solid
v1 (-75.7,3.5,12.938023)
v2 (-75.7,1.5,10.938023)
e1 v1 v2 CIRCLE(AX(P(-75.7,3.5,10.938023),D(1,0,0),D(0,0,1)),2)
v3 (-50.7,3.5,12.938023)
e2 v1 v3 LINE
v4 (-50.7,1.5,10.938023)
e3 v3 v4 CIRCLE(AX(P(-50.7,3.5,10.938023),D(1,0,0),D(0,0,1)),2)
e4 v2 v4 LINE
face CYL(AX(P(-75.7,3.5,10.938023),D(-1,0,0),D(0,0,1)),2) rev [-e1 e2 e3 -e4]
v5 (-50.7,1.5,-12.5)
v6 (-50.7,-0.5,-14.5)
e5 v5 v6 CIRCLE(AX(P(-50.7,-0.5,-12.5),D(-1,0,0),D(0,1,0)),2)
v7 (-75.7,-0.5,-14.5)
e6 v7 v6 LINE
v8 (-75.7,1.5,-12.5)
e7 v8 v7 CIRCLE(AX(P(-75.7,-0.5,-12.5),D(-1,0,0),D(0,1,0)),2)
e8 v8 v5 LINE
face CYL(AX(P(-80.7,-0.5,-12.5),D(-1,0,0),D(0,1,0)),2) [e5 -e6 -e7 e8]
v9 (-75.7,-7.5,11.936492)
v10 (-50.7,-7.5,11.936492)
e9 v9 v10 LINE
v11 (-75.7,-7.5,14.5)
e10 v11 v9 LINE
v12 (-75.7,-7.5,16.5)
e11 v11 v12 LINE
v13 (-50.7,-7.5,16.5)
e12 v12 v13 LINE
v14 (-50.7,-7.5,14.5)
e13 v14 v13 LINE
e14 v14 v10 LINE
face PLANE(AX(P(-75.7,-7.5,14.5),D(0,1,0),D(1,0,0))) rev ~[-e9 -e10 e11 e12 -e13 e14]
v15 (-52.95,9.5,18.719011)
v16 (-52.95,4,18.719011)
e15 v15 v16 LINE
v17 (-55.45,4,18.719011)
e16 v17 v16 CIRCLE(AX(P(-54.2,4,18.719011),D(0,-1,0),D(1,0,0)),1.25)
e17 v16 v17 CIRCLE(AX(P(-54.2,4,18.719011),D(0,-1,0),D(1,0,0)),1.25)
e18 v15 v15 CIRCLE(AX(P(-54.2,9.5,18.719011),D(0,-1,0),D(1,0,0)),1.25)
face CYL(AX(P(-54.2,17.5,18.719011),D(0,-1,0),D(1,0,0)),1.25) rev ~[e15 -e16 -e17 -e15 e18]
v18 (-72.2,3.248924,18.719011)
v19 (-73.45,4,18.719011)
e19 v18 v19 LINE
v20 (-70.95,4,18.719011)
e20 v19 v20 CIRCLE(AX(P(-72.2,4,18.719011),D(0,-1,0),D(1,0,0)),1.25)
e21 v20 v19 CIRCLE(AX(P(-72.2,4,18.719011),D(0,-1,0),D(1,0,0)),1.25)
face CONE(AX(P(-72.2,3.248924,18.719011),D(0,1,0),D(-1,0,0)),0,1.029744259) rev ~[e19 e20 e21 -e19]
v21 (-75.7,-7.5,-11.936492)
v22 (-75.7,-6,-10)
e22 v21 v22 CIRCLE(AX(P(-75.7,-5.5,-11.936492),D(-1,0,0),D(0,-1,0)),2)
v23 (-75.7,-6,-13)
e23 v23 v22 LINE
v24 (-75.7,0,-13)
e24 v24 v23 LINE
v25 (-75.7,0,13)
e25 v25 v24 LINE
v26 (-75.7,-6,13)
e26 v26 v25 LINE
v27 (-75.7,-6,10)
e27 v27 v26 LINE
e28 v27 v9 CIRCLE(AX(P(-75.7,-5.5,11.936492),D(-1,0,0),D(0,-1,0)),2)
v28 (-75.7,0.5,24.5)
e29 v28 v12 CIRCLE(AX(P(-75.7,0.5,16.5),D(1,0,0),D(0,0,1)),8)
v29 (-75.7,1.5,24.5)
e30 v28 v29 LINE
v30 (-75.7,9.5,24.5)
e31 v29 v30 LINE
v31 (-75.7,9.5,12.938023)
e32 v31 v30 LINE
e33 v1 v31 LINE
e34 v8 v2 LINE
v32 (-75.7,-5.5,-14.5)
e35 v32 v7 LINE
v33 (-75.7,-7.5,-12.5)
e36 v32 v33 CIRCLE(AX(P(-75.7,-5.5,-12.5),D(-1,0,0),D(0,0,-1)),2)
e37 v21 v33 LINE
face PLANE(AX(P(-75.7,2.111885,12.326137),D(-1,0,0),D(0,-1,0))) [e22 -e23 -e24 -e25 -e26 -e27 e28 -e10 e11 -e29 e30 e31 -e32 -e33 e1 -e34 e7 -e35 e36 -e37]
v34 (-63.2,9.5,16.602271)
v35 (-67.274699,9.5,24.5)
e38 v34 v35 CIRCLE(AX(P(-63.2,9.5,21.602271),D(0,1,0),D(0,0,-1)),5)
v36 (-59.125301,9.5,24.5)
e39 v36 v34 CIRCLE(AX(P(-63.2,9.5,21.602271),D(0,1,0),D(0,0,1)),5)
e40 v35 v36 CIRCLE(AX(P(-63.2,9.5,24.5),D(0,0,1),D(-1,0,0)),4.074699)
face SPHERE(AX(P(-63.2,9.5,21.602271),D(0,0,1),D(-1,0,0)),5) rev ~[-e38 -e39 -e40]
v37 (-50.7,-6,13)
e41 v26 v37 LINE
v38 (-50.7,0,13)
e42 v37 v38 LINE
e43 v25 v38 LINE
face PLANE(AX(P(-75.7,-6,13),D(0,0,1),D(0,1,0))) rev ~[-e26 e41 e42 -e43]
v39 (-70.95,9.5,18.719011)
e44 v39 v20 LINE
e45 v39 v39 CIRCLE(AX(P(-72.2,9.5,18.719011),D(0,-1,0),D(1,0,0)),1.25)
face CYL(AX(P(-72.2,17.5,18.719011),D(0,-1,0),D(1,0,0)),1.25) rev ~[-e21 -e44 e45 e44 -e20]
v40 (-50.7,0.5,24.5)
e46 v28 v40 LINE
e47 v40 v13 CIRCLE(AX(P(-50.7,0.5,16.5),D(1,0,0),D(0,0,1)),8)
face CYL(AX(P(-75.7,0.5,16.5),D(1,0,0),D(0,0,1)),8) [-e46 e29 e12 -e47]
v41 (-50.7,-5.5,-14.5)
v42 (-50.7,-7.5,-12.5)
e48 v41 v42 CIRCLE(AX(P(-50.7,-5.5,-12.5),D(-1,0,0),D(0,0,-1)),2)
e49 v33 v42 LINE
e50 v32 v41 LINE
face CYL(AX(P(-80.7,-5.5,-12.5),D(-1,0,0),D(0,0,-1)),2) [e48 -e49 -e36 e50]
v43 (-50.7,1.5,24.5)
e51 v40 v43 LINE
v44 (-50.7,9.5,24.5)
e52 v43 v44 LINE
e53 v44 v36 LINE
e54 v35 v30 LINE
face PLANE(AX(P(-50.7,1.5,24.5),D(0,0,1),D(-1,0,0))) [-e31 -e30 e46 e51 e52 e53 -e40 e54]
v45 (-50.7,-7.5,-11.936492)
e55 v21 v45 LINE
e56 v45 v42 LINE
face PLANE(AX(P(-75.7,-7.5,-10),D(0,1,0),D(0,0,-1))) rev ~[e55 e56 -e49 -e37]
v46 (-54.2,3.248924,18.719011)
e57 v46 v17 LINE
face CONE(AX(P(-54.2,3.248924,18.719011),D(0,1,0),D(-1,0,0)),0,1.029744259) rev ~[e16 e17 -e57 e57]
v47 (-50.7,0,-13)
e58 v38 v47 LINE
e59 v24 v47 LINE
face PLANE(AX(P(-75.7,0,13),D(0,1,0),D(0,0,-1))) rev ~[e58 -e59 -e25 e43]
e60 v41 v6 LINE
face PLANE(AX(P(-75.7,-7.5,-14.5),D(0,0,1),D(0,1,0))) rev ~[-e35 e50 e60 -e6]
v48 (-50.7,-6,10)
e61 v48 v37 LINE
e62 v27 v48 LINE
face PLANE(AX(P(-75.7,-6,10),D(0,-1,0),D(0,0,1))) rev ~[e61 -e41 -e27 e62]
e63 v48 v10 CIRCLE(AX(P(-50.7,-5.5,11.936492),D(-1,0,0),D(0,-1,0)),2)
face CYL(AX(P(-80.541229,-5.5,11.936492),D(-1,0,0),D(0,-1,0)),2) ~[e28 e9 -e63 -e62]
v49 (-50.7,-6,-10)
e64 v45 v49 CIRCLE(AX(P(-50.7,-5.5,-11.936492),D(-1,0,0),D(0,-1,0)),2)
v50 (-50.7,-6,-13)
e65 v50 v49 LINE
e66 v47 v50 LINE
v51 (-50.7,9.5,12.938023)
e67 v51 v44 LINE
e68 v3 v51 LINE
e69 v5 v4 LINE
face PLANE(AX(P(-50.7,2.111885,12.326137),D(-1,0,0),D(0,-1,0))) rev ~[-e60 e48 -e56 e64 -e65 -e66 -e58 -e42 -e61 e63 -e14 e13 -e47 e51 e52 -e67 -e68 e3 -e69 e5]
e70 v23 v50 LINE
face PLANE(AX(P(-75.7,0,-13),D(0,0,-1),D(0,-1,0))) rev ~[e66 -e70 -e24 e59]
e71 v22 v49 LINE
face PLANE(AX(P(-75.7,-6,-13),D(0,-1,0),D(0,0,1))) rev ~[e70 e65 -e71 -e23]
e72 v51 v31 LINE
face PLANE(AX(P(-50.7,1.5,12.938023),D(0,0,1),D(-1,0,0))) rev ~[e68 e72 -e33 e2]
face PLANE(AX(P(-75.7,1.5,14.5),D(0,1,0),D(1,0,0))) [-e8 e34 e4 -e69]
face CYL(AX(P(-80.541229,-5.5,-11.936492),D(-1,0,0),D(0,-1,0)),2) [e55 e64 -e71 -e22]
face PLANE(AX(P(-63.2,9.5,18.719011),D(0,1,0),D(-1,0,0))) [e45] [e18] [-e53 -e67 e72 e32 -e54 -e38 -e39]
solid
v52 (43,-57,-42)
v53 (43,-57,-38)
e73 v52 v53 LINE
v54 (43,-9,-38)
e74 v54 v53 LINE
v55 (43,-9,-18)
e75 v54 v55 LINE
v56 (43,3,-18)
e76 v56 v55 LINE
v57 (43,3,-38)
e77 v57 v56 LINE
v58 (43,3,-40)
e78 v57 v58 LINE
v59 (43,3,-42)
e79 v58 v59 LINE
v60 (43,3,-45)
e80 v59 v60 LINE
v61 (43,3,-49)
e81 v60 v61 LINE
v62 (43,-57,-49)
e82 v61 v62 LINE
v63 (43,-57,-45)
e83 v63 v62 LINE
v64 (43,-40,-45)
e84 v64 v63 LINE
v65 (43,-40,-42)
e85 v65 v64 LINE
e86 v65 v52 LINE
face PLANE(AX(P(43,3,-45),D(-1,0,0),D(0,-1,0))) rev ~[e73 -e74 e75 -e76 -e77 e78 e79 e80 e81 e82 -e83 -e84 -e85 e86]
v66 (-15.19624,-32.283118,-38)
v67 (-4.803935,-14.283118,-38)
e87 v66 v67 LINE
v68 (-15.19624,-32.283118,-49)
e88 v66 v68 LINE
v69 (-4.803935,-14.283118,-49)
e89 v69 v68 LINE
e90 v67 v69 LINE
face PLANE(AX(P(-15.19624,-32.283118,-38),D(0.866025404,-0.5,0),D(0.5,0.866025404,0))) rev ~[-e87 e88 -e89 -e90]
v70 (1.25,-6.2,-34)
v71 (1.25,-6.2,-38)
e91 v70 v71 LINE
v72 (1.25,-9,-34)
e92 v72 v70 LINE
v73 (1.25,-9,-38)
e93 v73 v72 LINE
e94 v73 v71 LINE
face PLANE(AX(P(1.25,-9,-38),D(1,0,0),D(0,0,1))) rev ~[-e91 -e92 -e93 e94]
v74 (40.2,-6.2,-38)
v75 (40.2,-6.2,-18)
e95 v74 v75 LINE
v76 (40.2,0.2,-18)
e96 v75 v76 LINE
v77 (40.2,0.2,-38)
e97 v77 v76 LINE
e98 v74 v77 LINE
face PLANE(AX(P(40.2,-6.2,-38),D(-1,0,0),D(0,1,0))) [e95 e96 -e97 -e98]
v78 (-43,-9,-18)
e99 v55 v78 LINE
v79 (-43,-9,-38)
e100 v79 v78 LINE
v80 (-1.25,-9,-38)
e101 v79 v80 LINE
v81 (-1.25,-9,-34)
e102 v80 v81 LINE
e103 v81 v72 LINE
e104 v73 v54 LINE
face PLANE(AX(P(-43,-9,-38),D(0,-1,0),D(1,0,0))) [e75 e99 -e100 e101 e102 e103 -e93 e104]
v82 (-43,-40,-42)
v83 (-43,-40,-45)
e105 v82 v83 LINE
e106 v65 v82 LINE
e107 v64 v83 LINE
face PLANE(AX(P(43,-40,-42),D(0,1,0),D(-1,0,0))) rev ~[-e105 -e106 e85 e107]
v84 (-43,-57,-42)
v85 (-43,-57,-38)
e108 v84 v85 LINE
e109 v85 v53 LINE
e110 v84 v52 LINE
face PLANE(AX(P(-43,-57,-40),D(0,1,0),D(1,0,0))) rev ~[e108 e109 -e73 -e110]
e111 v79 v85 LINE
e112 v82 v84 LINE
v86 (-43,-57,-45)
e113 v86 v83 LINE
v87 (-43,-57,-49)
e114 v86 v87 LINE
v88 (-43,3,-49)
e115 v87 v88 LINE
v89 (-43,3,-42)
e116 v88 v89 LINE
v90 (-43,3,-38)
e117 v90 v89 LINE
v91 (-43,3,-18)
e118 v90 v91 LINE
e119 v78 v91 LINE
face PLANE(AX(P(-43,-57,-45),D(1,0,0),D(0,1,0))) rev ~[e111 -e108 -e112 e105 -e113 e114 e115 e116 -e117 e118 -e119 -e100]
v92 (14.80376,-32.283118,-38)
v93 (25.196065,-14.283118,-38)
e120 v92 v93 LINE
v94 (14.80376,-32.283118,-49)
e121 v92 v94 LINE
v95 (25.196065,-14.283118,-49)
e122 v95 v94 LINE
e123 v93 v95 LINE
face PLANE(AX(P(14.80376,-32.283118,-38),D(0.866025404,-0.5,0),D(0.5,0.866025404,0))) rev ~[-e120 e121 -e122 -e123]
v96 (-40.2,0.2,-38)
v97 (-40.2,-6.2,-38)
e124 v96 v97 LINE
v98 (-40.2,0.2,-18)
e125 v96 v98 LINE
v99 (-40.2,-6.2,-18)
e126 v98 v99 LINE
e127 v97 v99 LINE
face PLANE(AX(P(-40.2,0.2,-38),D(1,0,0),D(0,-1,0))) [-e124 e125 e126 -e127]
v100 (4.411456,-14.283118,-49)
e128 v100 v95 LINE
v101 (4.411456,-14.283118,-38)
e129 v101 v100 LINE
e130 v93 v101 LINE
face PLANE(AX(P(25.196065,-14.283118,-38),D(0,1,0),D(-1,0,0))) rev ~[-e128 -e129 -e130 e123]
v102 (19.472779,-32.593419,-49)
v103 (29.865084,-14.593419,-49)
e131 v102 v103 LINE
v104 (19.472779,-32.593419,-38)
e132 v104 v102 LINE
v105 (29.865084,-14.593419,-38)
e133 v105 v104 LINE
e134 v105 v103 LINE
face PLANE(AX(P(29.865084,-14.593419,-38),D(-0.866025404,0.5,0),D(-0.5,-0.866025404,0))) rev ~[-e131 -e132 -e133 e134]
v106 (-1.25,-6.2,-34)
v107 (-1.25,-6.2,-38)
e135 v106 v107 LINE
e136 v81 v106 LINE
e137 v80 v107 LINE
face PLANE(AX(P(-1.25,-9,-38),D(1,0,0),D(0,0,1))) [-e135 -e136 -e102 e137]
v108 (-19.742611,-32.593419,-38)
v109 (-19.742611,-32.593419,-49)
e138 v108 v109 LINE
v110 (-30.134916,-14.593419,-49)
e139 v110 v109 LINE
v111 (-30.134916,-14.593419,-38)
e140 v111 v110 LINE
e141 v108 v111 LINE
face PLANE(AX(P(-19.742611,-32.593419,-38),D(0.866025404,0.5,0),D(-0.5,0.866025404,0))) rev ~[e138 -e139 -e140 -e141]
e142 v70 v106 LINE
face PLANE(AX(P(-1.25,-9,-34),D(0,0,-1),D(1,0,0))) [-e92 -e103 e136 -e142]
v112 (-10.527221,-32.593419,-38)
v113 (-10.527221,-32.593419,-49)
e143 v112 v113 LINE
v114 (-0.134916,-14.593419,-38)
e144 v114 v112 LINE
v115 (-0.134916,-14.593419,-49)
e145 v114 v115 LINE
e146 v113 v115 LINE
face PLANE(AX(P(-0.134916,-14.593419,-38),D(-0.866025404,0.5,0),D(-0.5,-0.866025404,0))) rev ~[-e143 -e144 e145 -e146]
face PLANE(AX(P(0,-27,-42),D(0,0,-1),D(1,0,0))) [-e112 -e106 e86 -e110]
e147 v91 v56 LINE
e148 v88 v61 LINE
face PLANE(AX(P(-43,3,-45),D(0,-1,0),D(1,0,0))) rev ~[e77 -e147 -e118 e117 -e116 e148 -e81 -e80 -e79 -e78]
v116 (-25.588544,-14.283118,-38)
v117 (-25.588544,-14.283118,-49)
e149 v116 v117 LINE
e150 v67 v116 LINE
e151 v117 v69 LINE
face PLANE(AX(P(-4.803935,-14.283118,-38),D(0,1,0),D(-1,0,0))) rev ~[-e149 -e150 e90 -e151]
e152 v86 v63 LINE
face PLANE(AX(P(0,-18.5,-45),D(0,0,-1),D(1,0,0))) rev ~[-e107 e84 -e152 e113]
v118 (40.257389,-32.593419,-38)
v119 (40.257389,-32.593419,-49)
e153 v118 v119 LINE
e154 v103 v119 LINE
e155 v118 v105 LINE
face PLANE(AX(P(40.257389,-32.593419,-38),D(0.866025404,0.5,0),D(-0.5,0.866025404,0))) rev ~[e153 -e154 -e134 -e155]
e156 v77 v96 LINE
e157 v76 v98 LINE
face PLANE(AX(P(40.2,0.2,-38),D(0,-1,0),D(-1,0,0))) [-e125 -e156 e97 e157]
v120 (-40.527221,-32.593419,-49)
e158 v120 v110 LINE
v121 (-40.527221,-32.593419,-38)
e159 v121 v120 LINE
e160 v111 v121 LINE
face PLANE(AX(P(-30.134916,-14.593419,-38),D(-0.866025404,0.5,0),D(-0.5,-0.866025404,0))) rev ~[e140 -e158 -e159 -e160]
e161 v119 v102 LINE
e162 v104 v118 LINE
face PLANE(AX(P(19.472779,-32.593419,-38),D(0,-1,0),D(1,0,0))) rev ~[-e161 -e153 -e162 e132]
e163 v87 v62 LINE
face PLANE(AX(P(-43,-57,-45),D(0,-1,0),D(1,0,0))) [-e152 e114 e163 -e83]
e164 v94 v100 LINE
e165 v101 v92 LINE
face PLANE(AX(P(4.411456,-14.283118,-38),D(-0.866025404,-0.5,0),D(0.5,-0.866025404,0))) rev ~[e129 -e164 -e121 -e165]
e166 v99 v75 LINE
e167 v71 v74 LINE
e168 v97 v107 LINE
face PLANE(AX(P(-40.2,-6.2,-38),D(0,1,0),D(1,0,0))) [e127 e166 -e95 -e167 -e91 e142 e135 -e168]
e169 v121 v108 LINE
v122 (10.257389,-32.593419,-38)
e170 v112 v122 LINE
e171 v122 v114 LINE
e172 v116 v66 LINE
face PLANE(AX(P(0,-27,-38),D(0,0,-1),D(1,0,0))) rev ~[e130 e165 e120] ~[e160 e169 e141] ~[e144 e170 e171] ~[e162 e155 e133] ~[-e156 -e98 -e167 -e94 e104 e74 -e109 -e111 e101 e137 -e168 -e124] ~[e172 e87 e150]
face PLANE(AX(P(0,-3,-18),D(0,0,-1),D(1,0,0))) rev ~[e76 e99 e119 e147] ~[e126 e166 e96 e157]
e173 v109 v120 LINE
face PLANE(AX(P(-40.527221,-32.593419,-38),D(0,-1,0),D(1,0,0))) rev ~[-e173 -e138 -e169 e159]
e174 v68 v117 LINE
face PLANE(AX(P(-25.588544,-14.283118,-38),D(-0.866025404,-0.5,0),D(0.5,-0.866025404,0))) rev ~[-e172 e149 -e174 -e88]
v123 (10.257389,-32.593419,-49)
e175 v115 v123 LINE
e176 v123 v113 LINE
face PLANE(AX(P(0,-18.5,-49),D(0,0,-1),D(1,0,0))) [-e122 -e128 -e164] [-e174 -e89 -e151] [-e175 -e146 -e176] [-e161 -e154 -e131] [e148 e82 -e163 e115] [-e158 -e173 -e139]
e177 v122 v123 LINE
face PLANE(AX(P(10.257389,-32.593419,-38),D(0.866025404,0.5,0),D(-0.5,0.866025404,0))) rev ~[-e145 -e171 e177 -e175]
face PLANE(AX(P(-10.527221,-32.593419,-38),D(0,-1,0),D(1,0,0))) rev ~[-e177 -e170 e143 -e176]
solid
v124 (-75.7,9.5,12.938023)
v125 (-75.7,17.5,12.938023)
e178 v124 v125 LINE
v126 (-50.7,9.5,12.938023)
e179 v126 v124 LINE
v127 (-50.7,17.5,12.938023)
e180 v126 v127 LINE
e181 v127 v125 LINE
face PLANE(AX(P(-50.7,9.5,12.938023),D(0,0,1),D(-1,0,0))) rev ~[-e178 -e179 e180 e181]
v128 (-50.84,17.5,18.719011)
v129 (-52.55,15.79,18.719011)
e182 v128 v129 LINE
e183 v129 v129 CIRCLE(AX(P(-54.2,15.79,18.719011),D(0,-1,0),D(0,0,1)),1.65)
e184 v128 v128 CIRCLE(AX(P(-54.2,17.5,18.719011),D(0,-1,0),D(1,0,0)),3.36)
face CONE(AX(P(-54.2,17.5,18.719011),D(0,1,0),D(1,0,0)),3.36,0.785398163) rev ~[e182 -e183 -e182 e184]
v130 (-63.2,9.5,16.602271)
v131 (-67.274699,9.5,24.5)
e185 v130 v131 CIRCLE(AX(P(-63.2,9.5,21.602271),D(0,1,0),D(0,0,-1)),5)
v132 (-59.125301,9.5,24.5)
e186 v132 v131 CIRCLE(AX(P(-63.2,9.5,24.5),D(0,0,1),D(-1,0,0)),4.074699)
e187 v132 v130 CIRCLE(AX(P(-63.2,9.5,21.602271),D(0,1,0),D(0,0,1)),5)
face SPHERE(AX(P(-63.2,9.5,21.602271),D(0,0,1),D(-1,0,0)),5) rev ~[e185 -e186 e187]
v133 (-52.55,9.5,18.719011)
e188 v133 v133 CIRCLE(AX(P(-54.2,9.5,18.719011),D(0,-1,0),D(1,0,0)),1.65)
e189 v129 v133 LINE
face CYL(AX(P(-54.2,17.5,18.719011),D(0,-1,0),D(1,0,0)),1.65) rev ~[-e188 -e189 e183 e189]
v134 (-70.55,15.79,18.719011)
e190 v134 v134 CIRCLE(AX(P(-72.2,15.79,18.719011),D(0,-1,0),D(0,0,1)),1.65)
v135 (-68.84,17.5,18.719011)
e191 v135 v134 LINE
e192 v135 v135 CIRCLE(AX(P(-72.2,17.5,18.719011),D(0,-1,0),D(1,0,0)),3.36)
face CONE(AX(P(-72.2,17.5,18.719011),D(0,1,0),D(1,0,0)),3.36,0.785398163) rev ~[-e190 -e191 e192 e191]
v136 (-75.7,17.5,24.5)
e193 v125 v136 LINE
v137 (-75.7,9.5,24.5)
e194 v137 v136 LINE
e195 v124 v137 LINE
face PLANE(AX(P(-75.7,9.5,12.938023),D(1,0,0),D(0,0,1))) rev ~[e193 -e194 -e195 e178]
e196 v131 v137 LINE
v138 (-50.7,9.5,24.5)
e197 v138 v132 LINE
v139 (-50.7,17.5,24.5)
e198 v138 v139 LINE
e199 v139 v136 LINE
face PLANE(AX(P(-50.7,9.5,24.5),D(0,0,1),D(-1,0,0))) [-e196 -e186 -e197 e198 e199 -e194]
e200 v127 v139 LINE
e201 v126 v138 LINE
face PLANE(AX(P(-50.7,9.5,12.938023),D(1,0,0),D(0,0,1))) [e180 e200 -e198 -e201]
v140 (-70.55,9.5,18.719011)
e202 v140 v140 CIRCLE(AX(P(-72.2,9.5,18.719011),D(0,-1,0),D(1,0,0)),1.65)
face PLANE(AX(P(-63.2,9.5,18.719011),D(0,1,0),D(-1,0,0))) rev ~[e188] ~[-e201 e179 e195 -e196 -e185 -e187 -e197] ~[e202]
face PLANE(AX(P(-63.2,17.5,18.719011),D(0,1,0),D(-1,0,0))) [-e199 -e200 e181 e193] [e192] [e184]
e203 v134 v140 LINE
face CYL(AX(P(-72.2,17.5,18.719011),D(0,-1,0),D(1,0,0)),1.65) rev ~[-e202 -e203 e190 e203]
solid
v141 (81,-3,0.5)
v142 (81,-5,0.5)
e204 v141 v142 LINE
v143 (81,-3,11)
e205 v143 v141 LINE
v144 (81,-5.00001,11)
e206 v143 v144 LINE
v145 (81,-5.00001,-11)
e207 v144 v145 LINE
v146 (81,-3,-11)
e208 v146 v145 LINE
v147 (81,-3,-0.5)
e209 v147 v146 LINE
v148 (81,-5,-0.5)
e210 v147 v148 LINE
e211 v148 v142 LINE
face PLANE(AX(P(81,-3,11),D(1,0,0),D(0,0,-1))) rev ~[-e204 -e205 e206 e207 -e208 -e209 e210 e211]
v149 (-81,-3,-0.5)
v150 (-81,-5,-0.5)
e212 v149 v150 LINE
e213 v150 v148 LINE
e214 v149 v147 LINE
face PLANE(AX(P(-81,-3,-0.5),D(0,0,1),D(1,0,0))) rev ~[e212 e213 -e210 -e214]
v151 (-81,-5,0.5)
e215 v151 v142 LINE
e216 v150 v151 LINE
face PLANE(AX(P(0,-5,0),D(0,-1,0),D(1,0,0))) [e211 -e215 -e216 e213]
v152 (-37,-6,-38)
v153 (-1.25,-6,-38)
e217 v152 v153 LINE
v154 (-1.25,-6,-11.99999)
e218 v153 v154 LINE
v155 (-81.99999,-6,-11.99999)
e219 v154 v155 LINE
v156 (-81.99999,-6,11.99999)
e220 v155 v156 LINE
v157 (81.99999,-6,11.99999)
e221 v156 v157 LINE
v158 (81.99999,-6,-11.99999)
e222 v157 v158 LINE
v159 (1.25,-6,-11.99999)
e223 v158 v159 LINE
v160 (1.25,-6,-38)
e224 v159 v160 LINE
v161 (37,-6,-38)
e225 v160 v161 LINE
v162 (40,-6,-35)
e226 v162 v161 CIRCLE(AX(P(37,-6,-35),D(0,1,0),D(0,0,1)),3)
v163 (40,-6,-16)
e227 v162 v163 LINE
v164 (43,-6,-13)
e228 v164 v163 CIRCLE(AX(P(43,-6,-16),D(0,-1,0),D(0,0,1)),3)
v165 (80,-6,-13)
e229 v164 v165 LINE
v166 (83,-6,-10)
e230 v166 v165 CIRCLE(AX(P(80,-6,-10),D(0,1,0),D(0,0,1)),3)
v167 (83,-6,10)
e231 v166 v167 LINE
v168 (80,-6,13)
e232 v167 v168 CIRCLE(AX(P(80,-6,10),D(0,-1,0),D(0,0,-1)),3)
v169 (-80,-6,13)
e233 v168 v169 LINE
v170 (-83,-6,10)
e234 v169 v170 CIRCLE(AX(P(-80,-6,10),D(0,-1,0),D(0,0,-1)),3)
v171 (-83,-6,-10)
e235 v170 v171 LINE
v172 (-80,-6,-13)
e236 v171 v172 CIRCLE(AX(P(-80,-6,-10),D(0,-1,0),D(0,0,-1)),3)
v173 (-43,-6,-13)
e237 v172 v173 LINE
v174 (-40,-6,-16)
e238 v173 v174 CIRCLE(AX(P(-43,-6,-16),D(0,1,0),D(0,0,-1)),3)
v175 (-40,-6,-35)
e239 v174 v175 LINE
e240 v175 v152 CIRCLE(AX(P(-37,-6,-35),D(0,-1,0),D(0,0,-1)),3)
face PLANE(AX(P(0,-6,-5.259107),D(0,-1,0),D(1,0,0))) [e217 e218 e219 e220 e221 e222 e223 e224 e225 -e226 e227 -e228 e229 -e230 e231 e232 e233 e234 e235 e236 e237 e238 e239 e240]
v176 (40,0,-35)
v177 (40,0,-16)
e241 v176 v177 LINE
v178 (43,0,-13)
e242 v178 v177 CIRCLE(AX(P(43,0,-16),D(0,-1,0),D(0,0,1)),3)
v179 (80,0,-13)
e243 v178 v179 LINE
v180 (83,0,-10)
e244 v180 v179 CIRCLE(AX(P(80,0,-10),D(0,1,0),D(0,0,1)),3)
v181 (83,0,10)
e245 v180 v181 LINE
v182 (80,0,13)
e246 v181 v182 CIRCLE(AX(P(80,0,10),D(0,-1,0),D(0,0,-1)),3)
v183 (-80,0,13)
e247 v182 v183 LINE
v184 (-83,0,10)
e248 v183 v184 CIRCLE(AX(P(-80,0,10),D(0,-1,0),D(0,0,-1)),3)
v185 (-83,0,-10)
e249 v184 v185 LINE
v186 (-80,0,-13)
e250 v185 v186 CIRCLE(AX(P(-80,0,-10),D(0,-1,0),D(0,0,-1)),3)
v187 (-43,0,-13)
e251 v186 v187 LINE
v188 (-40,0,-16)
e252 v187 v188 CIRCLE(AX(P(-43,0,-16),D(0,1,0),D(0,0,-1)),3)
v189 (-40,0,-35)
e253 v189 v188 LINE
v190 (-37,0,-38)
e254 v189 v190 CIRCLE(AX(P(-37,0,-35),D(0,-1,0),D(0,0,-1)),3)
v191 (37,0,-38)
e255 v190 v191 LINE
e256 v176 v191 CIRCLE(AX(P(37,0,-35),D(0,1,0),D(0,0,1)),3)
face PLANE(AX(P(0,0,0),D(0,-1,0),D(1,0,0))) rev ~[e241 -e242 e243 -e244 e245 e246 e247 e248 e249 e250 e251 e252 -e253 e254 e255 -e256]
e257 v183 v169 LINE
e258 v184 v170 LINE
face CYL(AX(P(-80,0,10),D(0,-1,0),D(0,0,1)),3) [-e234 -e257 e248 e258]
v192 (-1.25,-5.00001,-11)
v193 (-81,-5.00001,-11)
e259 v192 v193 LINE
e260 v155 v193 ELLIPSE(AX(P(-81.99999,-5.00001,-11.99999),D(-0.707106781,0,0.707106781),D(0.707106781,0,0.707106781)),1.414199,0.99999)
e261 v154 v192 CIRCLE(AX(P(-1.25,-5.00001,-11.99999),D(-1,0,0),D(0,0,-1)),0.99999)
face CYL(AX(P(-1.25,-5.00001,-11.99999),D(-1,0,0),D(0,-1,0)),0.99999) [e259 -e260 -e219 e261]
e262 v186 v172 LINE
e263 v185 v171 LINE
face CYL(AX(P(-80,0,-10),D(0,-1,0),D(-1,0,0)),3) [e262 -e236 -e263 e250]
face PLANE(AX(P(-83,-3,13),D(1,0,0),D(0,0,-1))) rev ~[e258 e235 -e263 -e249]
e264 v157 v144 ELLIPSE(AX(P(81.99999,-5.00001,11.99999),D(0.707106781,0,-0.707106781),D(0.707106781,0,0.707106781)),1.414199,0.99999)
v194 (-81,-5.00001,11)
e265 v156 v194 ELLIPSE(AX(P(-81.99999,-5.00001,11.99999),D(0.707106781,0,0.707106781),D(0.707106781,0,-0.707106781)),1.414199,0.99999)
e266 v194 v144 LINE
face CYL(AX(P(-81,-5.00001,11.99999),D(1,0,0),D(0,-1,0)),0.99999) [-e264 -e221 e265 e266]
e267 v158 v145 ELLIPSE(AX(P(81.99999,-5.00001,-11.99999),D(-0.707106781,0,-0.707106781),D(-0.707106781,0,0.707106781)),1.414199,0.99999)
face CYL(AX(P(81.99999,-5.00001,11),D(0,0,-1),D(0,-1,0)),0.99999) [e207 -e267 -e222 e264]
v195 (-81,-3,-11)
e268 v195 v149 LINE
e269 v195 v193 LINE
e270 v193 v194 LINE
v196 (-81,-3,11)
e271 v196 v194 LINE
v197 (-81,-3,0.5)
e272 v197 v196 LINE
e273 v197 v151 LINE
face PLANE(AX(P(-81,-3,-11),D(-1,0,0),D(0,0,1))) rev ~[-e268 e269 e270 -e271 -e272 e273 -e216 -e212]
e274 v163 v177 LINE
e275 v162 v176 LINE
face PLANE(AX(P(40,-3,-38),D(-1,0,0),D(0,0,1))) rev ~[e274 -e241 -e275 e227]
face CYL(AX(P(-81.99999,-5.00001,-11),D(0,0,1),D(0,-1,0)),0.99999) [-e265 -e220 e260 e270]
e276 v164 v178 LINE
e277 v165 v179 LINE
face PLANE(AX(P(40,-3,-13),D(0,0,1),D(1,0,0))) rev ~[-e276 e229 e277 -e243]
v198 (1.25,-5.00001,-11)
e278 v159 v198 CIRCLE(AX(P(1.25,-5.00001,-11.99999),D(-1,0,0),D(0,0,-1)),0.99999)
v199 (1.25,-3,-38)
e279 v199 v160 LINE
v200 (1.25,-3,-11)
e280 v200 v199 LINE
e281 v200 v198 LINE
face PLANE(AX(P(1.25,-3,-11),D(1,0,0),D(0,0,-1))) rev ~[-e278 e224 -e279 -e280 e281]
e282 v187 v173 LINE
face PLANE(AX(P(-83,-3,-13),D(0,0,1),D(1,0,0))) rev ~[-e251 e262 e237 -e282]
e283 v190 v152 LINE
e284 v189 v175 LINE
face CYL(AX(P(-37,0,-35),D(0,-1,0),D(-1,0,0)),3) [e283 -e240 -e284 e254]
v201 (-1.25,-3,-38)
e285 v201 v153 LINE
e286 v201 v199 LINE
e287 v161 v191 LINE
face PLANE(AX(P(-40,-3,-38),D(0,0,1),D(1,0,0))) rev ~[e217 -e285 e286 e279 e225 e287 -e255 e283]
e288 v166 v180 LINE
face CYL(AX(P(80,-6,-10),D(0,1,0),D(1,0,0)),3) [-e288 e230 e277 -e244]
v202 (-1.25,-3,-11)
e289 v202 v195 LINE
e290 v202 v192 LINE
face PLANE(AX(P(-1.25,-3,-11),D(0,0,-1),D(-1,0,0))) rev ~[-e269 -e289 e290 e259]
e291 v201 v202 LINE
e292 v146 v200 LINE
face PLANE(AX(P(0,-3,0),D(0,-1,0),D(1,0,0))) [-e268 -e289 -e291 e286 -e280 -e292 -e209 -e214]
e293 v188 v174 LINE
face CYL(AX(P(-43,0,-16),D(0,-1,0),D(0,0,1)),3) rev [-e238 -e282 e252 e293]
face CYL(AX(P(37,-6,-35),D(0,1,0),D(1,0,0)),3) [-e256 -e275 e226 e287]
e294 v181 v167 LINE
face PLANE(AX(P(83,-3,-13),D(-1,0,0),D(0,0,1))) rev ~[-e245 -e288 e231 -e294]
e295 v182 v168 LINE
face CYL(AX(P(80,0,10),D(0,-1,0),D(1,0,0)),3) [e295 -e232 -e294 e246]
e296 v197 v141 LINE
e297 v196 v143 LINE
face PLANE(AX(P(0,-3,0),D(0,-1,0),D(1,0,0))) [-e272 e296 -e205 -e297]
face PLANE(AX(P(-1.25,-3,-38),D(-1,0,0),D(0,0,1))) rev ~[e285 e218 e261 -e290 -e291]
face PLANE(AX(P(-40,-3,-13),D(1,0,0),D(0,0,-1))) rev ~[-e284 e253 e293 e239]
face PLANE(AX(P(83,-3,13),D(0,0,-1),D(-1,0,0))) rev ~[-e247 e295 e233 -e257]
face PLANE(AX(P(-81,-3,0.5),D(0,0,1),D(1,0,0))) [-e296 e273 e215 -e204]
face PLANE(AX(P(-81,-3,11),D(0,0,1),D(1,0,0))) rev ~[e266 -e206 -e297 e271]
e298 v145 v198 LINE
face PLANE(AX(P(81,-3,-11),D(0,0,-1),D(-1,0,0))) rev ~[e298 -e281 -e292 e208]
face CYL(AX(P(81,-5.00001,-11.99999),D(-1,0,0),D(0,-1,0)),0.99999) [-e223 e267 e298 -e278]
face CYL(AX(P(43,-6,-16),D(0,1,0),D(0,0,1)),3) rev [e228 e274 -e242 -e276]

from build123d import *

# Parameters (mm, degrees)
F0_W              = 80
F0_H              = 25
F1_DEPTH          = 3
F3_DEPTH          = 3
F4_W              = 162
F4_H              = 1
F5_DEPTH          = 2
F6_R              = 3
F7_R              = 0.99999
F9_DEPTH          = 20
F10_W             = 85.9999992251
F10_H             = 11.9999992251
F11_DEPTH         = 2
F12_W             = 2.5
F12_H             = 4
F13_DEPTH         = 4
F14_W             = 85.9999992251
F14_H             = 60
F15_DEPTH         = 2
F17_DEPTH         = 3
F18_W             = 85.9999992251
F18_H             = 42.9999996126
F18_H_2           = 17.0000003874
F19_DEPTH         = 4
F21_DEPTH         = 50
F23_DEPTH         = 25
F25_W             = 25
F25_H             = 8.9999996647
F26_DEPTH         = 10
F27_W             = 25
F27_H             = 11.5619772188
F28_DEPTH         = 8
F31_W             = 25
F31_H             = 11.5619772188
F32_DEPTH         = 8
F34_R             = 8
F35_T1_DEPTH      = 25
F35_T3_DEPTH      = 34.6824581491
F35_T5_DEPTH      = 35
F35_T7_DEPTH      = 35
F35_T9_DEPTH      = 34.6824581491
F37_D             = 2.5
F37_DEPTH         = 13.5
F37_CSINK_D       = 6.72
F37_CSINK_ANGLE   = 90
F37_TIP           = 0.7510757738
F37_2_D           = 2.5
F37_2_DEPTH       = 13.5
F37_2_CSINK_D     = 6.72
F37_2_CSINK_ANGLE = 90
F37_2_TIP         = 0.7510757738
F38_D             = 3.3
F38_DEPTH         = 13.5
F38_CSINK_D       = 6.72
F38_CSINK_ANGLE   = 90
F38_TIP           = 0.9914200214


# Not quite as in the source:
# - a fillet or chamfer that OpenCascade refuses, or shapes differently, is made with other operations: its cross-section is extruded or revolved along the edge and cut away or added
# - a fillet or chamfer is up to 0.001 mm smaller than in the source, because OpenCascade refuses the exact size


with BuildPart() as f1:
    # F0 (on Front) → F1 (new body)
    with BuildSketch(Plane.XZ):
        Polygon((40, -13), (83, -13), (83, 13), (-83, 13), (-83, -13), (-40, -13), align=None)
        with Locations((0, -25.5)):
            Rectangle(F0_W, F0_H)
    extrude(amount=F1_DEPTH)

    # F2 (on face) → F3 (join)
    with BuildSketch(Plane.XZ.offset(3)):
        Polygon((83, -13), (83, 13), (-83, 13), (-83, -13), (-40, -13), (-40, -38), (-1.25, -38), (-1.25, -11), (-40, -11), (-81, -11), (-81, 11), (81, 11), (81, -11), (40, -11), (1.25, -11), (1.25, -38), (40, -38), (40, -13), align=None)
    extrude(amount=F3_DEPTH)

    # F4 (on face) → F5 (join)
    with BuildSketch(Plane.XZ.offset(3)):
        Rectangle(F4_W, F4_H)
    extrude(amount=F5_DEPTH)

    # F6
    f6_edges = [f1.edges().sort_by_distance(p)[0] for p in [
        (83, -3, 13),
        (83, -3, -13),
        (40, -3, -13),
        (-40, -3, -13),
        (-83, -3, -13),
        (-83, -3, 13),
        (40, -3, -38),
        (-40, -3, -38),
    ]]
    fillet(f6_edges, radius=F6_R)

    # F7 (radius 1 in the source; OpenCascade refuses exactly that, so slightly less here)
    f7_edges = [f1.edges().sort_by_distance(p)[0] for p in [
        (0, -6, 11),
        (-81, -6, 0),
        (-41.125, -6, -11),
        (41.125, -6, -11),
        (81, -6, 0),
    ]]
    fillet(f7_edges, radius=F7_R)


with BuildPart() as f9:
    # F8 (on face) → F9 (new body)
    with BuildSketch(Plane(origin=(0, 0, -38), x_dir=(1, 0, 0), z_dir=(0, 0, -1))):
        Polygon((37, 8.9999996126), (1.25, 8.9999996126), (-1.25, 8.9999996126), (-37, 8.9999996126), (-42.9999996126, 8.9999996126), (-42.9999996126, -2.9999996126), (-37, -2.9999996126), (37, -2.9999996126), (42.9999996126, -2.9999996126), (42.9999996126, 8.9999996126), align=None)
        Polygon((-40.2, 6.2), (-37, 6.2), (-1.25, 6.2), (1.25, 6.2), (37, 6.2), (40.2, 6.2), (40.2, -0.2), (37, -0.2), (-37, -0.2), (-40.2, -0.2), align=None, mode=Mode.SUBTRACT)
    extrude(amount=-F9_DEPTH)

    # F10 (on face) → F11 (join)
    with BuildSketch(Plane(origin=(0, 0, -38), x_dir=(1, 0, 0), z_dir=(0, 0, -1))):
        with Locations((0, 3)):
            Rectangle(F10_W, F10_H)
    extrude(amount=F11_DEPTH)

    # F12 (on face) → F13 (cut)
    with BuildSketch(Plane.XZ.offset(8.9999996126)):
        with Locations((0, -36)):
            Rectangle(F12_W, F12_H)
    extrude(amount=-F13_DEPTH, mode=Mode.SUBTRACT)

    # F14 (on face) → F15 (join, symmetric)
    with BuildSketch(Plane(origin=(0, 0, -40), x_dir=(1, 0, 0), z_dir=(0, 0, -1))):
        with Locations((0, 27.0000003874)):
            Rectangle(F14_W, F14_H)
    extrude(amount=F15_DEPTH, both=True)

    # F16 (on face) → F17 (join)
    with BuildSketch(Plane(origin=(0, 0, -42), x_dir=(1, 0, 0), z_dir=(0, 0, -1))):
        Polygon((-42.9999996126, 40), (-42.9999996126, 3.874e-07), (-42.9999996126, -2.9999996126), (42.9999996126, -2.9999996126), (42.9999996126, 0), (42.9999996126, 40), align=None)
    extrude(amount=F17_DEPTH)

    # F18 (on face) → F19 (join)
    with BuildSketch(Plane(origin=(0, 0, -45), x_dir=(1, 0, 0), z_dir=(0, 0, -1))):
        with Locations((0, 18.5000001937)):
            Rectangle(F18_W, F18_H)
        with Locations((0, 48.5000001937)):
            Rectangle(F18_W, F18_H_2)
    extrude(amount=F19_DEPTH)

    # F20 (on face) → F21 (cut)
    with BuildSketch(Plane.XY.offset(-38)):
        Polygon((-40.527221151, -32.5934187919), (-19.7426114601, -32.5934187919), (-30.1349163055, -14.5934187919), align=None)
        Polygon((-10.527221151, -32.5934187919), (10.2573885399, -32.5934187919), (-0.1349163055, -14.5934187919), align=None)
        Polygon((19.472778849, -32.5934187919), (40.2573885399, -32.5934187919), (29.8650836945, -14.5934187919), align=None)
        Polygon((-4.8039347303, -14.2831178904), (-25.5885444212, -14.2831178904), (-15.1962395757, -32.2831178904), align=None)
        Polygon((25.1960652697, -14.2831178904), (4.4114555788, -14.2831178904), (14.8037604243, -32.2831178904), align=None)
    extrude(amount=-F21_DEPTH, mode=Mode.SUBTRACT)


with BuildPart() as f23:
    # F22 (on Right) → F23 (new body)
    with BuildSketch(Plane.YZ):
        Polygon((-6, 13), (0, 13), (0, 10), (0, -10), (0, -13), (-6, -13), (-6, -10), (-7.4999998324, -10), (-7.4999998324, -14.4999998324), (1.4999998324, -14.4999998324), (1.4999998324, -10), (1.4999998324, 10), (1.4999998324, 14.4999998324), (-7.4999998324, 14.4999998324), (-7.4999998324, 10), (-6, 10), align=None)
    extrude(amount=F23_DEPTH)


with BuildPart() as f23_1:
    # F24: moved
    add(f23.part.moved(Location((-75.7, 0, 0))))

    # F25 (on face) → F26 (join)
    with BuildSketch(Plane.XY.offset(14.4999998324)):
        with Locations((-63.2, -3)):
            Rectangle(F25_W, F25_H)
    extrude(amount=F26_DEPTH)

    # F27 (on face) → F28 (join)
    with BuildSketch(Plane(origin=(0, 1.4999998324, 0), x_dir=(-1, 0, 0), z_dir=(0, 1, 0))):
        with Locations((63.2, 18.7190112229)):
            Rectangle(F27_W, F27_H)
    extrude(amount=F28_DEPTH)


with BuildPart() as f30:
    # F29 (on face) → F30 (revolve)
    with BuildSketch(Plane(origin=(0, 9.4999998324, 0), x_dir=(-1, 0, 0), z_dir=(0, 1, 0))):
        with BuildLine():
            Line((63.2, 24.4999998324), (63.2, 16.6022711247))
            ThreePointArc((63.2, 16.6022711247), (67.6434583118, 19.3097445205), (67.2746985578, 24.4999998324))
            Line((67.2746985578, 24.4999998324), (63.2, 24.4999998324))
        make_face()
    revolve(axis=Axis((-63.2, 9.4999998324, 21.6022711247), (0, 0, 1)))


with BuildPart() as f32:
    # F31 (on face) → F32 (new body)
    with BuildSketch(Plane(origin=(0, 9.4999998324, 0), x_dir=(-1, 0, 0), z_dir=(0, 1, 0))):
        with Locations((63.2, 18.7190112229)):
            Rectangle(F31_W, F31_H)
    extrude(amount=F32_DEPTH)

    # F33: cut F30
    add(f30.part, mode=Mode.SUBTRACT)

    # F37#2
    with Locations(Plane(origin=(0, 17.4999998324, 0), x_dir=(-1, 0, 0), z_dir=(0, 1, 0))):
        with Locations((54.2, 18.7190112229), (72.2, 18.7190112229)):
            CounterSinkHole(F37_2_D / 2, F37_2_CSINK_D / 2, depth=F37_2_DEPTH, counter_sink_angle=F37_2_CSINK_ANGLE)
            with Locations((0, 0, -(F37_2_DEPTH + F37_2_TIP / 2))):  # 118° drill point
                Cone(0, F37_2_D / 2, F37_2_TIP, mode=Mode.SUBTRACT)

    # F38
    with Locations(Plane(origin=(0, 17.4999998324, 0), x_dir=(-1, 0, 0), z_dir=(0, 1, 0))):
        with Locations((54.2, 18.7190112229), (72.2, 18.7190112229)):
            CounterSinkHole(F38_D / 2, F38_CSINK_D / 2, depth=F38_DEPTH, counter_sink_angle=F38_CSINK_ANGLE)
            with Locations((0, 0, -(F38_DEPTH + F38_TIP / 2))):  # 118° drill point
                Cone(0, F38_D / 2, F38_TIP, mode=Mode.SUBTRACT)


with BuildPart() as f23_2:
    add(f23_1.part)

    # F33: cut F30
    add(f30.part, mode=Mode.SUBTRACT)

    # F34
    f34_edges = [f23_2.edges().sort_by_distance(p)[0] for p in [
        (-63.2, -7.5, 24.5),
    ]]
    fillet(f34_edges, radius=F34_R)

    # F35: fillet of radius 2 on 5 edges, made by hand

    # F35_s2 → F35_t1 (join)
    with BuildSketch(Plane.YZ.offset(-75.7)):
        with BuildLine():
            ThreePointArc((3.4999998324, 12.9380226135), (2.08578627, 12.3522361759), (1.4999998324, 10.9380226135))
            Line((1.4999998324, 10.9380226135), (1.4999998324, 12.9380226135))
            Line((1.4999998324, 12.9380226135), (3.4999998324, 12.9380226135))
        make_face()
    extrude(amount=F35_T1_DEPTH)

    # F35_s4 → F35_t3 (cut)
    with BuildSketch(Plane.YZ.offset(-80.5412290745)):
        with BuildLine():
            ThreePointArc((-7.4999998324, 11.9364916298), (-7.0811387155, 10.7117468269), (-6, 10))
            Line((-6, 10), (-7.4999998324, 10))
            Line((-7.4999998324, 10), (-7.4999998324, 11.9364916298))
        make_face()
    extrude(amount=F35_T3_DEPTH, mode=Mode.SUBTRACT)

    # F35_s6 → F35_t5 (cut)
    with BuildSketch(Plane.YZ.offset(-80.7)):
        with BuildLine():
            ThreePointArc((1.4999998324, -12.4999998324), (0.9142133947, -13.9142133947), (-0.5000001676, -14.4999998324))
            Line((-0.5000001676, -14.4999998324), (1.4999998324, -14.4999998324))
            Line((1.4999998324, -14.4999998324), (1.4999998324, -12.4999998324))
        make_face()
    extrude(amount=F35_T5_DEPTH, mode=Mode.SUBTRACT)

    # F35_s8 → F35_t7 (cut)
    with BuildSketch(Plane.YZ.offset(-80.7)):
        with BuildLine():
            ThreePointArc((-5.4999998324, -14.4999998324), (-6.9142133947, -13.9142133947), (-7.4999998324, -12.4999998324))
            Line((-7.4999998324, -12.4999998324), (-7.4999998324, -14.4999998324))
            Line((-7.4999998324, -14.4999998324), (-5.4999998324, -14.4999998324))
        make_face()
    extrude(amount=F35_T7_DEPTH, mode=Mode.SUBTRACT)

    # F35_s10 → F35_t9 (cut)
    with BuildSketch(Plane.YZ.offset(-80.5412290745)):
        with BuildLine():
            ThreePointArc((-7.4999998324, -11.9364916298), (-7.0811387155, -10.7117468269), (-6, -10))
            Line((-6, -10), (-7.4999998324, -10))
            Line((-7.4999998324, -10), (-7.4999998324, -11.9364916298))
        make_face()
    extrude(amount=F35_T9_DEPTH, mode=Mode.SUBTRACT)

    # F37
    with Locations(Plane(origin=(0, 17.4999998324, 0), x_dir=(-1, 0, 0), z_dir=(0, 1, 0))):
        with Locations((54.2, 18.7190112229), (72.2, 18.7190112229)):
            CounterSinkHole(F37_D / 2, F37_CSINK_D / 2, depth=F37_DEPTH, counter_sink_angle=F37_CSINK_ANGLE)
            with Locations((0, 0, -(F37_DEPTH + F37_TIP / 2))):  # 118° drill point
                Cone(0, F37_D / 2, F37_TIP, mode=Mode.SUBTRACT)


solid = Compound([f1.part, f9.part, f32.part, f23_2.part])
